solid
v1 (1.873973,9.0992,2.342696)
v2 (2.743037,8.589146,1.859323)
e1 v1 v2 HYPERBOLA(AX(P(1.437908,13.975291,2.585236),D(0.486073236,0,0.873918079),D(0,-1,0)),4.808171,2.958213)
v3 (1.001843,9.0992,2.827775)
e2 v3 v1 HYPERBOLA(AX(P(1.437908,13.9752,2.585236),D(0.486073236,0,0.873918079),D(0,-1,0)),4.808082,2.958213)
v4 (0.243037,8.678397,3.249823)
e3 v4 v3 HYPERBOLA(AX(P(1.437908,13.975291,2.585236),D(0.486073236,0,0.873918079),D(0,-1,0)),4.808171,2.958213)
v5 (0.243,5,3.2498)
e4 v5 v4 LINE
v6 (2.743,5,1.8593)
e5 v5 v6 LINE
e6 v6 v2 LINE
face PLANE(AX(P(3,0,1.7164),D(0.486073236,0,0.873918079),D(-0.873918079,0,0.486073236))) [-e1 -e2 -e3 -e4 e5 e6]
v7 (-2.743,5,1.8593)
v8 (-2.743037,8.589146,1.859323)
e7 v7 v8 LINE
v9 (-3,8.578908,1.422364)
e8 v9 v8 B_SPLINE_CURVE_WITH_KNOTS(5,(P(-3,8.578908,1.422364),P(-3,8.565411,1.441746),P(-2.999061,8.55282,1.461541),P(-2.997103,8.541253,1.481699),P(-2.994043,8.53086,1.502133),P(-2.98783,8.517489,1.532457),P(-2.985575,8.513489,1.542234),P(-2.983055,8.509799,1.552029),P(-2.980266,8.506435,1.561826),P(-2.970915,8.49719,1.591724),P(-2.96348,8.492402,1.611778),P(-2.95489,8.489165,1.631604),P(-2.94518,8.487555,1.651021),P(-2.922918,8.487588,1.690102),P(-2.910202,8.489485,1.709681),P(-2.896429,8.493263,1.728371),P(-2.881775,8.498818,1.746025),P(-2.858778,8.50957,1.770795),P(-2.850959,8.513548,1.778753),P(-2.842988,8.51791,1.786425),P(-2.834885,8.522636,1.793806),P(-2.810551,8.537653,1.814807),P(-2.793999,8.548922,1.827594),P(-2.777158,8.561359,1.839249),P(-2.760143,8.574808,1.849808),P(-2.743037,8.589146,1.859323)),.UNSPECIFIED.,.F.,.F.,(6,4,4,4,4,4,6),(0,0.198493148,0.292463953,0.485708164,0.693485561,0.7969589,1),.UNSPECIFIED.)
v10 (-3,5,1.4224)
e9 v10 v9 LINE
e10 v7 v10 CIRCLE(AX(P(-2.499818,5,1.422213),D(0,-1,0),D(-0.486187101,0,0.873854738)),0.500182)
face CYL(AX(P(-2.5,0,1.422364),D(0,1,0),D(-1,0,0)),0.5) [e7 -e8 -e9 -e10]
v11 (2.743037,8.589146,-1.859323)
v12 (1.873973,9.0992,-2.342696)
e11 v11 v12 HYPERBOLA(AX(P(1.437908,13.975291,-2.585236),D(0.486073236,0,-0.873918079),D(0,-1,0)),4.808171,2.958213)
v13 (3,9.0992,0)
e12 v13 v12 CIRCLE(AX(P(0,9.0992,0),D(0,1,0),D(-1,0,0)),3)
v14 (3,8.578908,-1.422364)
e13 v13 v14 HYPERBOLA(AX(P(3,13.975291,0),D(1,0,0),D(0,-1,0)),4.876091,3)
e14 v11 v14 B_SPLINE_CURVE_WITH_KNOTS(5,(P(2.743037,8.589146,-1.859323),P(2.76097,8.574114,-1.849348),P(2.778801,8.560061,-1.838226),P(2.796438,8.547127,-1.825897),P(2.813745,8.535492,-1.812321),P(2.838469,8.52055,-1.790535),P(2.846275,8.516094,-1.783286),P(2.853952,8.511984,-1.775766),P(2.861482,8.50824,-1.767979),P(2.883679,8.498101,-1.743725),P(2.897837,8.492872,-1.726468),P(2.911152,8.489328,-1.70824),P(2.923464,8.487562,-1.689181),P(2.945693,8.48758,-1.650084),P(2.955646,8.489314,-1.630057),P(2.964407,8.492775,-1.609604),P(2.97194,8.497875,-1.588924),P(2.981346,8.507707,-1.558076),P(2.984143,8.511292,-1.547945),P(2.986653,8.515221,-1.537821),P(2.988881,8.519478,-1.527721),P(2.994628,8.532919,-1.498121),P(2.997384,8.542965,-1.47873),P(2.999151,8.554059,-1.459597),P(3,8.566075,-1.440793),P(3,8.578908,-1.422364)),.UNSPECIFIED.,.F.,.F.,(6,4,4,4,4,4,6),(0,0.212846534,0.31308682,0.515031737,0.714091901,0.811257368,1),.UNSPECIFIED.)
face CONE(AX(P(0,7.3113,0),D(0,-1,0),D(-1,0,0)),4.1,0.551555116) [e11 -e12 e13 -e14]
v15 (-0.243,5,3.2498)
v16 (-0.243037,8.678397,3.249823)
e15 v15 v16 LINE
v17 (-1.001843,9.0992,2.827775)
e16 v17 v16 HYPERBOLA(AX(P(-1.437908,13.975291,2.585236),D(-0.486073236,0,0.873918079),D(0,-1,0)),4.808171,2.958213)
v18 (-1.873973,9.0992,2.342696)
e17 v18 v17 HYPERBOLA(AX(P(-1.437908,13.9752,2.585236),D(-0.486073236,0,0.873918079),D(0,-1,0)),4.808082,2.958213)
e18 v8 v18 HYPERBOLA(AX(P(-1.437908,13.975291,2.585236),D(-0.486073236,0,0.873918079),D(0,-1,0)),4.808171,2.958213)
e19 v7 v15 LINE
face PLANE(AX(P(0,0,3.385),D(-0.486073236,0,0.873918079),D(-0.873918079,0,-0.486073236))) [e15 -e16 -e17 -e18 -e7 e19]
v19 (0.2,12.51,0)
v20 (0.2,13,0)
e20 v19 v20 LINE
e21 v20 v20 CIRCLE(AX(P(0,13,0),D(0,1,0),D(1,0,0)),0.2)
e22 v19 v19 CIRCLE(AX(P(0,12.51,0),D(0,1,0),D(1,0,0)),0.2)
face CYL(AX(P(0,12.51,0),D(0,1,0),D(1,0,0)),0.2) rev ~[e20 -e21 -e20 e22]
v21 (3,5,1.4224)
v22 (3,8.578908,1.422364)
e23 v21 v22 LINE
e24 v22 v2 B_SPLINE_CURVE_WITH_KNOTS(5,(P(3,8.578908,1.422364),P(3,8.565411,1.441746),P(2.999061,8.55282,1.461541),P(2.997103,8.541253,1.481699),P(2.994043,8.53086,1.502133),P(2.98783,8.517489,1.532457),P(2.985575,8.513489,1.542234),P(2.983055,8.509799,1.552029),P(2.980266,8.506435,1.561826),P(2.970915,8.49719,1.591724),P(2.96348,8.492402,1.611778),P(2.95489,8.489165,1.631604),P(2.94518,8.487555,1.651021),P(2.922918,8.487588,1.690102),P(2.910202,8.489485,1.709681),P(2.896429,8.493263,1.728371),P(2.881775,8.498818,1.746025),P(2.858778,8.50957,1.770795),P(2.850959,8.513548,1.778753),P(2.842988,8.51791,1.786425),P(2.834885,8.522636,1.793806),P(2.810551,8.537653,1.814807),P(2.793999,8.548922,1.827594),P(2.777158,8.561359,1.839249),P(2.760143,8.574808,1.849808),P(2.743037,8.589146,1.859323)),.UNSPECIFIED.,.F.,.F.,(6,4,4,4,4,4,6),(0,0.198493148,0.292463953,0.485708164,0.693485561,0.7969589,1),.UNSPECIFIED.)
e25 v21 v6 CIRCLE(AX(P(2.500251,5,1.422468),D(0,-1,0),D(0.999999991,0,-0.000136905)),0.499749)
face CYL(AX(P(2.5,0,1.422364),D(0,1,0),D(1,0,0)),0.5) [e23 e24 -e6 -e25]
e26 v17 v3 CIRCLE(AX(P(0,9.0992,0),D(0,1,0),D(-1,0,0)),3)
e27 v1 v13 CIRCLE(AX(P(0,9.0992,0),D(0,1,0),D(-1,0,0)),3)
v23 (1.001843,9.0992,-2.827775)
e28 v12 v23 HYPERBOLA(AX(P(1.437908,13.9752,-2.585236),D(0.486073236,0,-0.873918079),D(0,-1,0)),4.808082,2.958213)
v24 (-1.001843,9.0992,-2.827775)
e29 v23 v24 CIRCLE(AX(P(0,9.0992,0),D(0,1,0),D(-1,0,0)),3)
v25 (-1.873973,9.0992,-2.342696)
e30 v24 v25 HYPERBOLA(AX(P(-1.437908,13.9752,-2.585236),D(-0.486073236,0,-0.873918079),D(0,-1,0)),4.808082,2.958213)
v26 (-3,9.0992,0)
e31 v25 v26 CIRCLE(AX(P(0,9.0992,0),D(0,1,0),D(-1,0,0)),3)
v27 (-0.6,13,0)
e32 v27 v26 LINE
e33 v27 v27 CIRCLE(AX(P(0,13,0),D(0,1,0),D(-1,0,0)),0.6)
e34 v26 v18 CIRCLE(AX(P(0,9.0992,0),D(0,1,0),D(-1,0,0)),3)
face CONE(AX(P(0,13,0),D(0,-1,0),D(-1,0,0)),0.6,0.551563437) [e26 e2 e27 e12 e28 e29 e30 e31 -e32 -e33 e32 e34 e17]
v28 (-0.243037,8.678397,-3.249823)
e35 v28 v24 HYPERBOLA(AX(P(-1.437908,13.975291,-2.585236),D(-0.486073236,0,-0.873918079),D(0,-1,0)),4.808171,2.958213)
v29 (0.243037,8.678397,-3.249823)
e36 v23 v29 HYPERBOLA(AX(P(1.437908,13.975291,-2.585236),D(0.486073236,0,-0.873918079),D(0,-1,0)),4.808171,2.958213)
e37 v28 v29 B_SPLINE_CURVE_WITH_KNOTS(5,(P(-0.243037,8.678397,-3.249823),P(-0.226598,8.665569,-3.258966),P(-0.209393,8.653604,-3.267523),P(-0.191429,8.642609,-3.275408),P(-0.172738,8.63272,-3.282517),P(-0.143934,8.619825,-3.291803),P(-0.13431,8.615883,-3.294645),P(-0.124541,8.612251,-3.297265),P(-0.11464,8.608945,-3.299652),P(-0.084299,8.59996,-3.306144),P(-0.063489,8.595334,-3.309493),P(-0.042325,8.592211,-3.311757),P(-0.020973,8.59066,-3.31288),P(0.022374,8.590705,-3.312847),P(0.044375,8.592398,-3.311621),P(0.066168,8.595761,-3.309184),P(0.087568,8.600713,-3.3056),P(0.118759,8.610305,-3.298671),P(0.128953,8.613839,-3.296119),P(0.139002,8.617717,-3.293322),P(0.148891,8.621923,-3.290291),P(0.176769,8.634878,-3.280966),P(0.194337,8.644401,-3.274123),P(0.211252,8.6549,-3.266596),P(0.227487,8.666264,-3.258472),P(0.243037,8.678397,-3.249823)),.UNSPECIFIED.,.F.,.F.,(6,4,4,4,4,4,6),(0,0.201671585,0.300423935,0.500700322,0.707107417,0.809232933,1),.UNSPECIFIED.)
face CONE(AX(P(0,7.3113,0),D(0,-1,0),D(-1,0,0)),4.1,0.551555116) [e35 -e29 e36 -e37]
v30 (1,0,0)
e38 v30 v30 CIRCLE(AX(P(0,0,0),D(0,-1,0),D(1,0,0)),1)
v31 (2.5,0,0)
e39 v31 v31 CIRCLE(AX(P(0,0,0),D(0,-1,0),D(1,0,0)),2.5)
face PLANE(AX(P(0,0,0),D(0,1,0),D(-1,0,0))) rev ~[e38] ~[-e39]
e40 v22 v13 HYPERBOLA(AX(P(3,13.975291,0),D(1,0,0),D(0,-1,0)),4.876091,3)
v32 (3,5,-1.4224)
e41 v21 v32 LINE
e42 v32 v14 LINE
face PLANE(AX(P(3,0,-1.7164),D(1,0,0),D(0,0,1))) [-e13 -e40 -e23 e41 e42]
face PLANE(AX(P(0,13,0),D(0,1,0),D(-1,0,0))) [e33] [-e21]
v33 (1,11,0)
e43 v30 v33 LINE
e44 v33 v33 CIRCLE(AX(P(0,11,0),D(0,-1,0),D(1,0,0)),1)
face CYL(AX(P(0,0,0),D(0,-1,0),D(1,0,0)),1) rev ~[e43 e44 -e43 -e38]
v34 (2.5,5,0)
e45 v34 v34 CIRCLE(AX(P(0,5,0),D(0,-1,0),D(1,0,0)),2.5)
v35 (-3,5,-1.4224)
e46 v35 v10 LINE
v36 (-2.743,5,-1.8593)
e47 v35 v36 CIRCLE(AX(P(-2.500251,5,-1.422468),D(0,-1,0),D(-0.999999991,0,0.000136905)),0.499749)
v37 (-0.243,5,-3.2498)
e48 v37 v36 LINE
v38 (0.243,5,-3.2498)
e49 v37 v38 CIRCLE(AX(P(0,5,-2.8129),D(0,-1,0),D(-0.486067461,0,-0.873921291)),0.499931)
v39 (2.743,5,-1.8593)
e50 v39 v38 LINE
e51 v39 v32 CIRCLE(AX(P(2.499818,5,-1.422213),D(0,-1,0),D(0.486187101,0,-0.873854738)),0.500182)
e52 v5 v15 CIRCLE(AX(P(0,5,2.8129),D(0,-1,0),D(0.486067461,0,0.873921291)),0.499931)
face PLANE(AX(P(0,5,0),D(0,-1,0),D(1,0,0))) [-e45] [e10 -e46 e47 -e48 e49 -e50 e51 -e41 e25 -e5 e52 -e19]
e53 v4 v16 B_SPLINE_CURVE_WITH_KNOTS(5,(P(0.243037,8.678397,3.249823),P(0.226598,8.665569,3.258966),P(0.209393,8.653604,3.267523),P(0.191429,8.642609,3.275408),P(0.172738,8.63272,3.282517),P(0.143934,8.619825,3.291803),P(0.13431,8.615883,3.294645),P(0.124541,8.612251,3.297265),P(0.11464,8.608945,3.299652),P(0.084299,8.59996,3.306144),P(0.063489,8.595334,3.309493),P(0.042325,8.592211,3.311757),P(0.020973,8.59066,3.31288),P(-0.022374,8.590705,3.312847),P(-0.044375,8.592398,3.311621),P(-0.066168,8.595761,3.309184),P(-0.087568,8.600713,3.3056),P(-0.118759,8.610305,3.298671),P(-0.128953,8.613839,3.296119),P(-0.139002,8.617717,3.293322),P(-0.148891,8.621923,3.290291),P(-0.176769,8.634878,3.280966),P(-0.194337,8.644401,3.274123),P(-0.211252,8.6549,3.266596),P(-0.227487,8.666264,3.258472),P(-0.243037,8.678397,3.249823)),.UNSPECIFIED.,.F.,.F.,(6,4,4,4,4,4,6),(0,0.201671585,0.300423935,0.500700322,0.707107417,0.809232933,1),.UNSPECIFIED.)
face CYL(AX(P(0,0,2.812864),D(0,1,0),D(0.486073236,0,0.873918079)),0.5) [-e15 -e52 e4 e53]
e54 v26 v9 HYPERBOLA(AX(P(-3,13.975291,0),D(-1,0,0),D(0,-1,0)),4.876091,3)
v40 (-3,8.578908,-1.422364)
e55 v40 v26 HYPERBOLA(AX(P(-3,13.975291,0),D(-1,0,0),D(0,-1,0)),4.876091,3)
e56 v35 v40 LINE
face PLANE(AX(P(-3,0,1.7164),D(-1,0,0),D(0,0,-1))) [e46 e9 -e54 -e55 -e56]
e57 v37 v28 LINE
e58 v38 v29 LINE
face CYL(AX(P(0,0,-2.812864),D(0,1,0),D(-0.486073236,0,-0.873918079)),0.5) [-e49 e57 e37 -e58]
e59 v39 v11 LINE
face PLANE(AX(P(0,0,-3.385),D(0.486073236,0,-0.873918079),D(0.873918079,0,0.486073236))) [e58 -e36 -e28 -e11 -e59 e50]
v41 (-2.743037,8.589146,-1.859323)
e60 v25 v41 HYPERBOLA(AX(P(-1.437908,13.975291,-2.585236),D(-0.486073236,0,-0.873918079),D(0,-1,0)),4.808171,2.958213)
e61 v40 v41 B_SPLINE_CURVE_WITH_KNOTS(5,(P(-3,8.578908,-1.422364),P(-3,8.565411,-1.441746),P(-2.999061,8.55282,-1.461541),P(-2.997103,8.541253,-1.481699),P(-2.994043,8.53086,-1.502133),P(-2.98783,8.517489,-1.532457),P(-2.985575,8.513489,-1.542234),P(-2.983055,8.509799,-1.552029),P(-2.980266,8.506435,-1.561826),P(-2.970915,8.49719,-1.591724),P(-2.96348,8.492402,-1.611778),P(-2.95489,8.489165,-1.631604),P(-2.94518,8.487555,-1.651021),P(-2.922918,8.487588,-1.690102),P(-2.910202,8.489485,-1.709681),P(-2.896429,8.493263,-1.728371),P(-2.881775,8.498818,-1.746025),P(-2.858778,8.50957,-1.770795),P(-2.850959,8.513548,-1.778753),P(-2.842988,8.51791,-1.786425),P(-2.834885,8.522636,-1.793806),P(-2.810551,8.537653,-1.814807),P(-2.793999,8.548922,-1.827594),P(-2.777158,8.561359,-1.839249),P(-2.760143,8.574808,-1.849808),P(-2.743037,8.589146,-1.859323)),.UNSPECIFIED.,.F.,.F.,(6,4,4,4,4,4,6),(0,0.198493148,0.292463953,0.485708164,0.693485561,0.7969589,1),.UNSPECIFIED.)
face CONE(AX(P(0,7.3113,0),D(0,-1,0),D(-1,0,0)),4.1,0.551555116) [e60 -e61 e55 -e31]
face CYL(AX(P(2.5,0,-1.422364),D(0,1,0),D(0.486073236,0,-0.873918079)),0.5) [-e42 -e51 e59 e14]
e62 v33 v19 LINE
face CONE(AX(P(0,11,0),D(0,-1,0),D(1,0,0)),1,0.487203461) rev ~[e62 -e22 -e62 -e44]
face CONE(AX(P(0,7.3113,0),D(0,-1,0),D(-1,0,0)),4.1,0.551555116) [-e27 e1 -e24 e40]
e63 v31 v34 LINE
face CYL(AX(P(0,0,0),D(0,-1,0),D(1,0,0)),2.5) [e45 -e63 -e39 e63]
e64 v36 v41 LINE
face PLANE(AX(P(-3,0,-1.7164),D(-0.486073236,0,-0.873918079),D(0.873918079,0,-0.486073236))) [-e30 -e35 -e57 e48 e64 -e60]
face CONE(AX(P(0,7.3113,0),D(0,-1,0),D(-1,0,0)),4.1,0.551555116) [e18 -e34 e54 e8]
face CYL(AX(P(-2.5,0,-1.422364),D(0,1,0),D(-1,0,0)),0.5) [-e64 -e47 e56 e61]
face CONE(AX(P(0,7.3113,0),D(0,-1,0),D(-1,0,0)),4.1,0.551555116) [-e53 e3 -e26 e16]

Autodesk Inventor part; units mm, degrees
ref_plane "YZ Plane" through (0, 0, 0) normal (1, 0, 0) x (0, 1, 0)
ref_plane "XZ Plane" through (0, 0, 0) normal (0, 1, 0) x (-1, 0, 0)
ref_plane "XY Plane" through (0, 0, 0) normal (0, 0, 1) x (1, 0, 0)
sketch "Sketch1" plane through (0, 0, 0) normal (0, 1, 0) x (-1, 0, 0)
  line L0 (0, -4.739) -> (0, 4.739) construction
  line L1 (4.2, 0) -> (-4.2, 0) construction
  line L2 (3, 1.7164) -> (3, -1.7164)
  line L3 (3, -1.7164) -> (0, -3.385)
  line L4 (0, -3.385) -> (-3, -1.7164)
  line L5 (-3, -1.7164) -> (-3, 1.7164)
  line L6 (-3, 1.7164) -> (0, 3.385)
  line L7 (0, 3.385) -> (3, 1.7164)
  point P0 (3, 0)
  point P1 (-3, 0)
  dimension "d2" = 6.77
  dimension "d3" = 6
extrude "Extrusion1" add sketch "Sketch1" along normal blind 13
fillet "Fillet1" radius 0.5 6 edges at (0, 6.5, 3.385) (3, 6.5, 1.7164) (3, 6.5, -1.7164) (0, 6.5, -3.385) (-3, 6.5, -1.7164) (-3, 6.5, 1.7164)
sketch "Sketch2" plane through (0, 0, 0) normal (0, 0, 1) x (1, 0, 0)
  line L0 (-0.243, 13) -> (0.243, 13) projected
  line L1 (0, 13) -> (-0.1, 13)
  line L2 (-0.1, 13) -> (-0.6, 13)
  line L3 (-0.6, 13) -> (-3, 9.0992)
  line L4 (-0.243, 13) -> (-2.743, 13) projected
  line L5 (0, 13) -> (0, 13.665)
  line L6 (-0.6, 13) -> (-4.1, 13)
  line L7 (-4.1, 13) -> (-4.1, 7.3113)
  line L8 (-3, 13) -> (-3, 0) projected
  line L9 (-4.1, 7.3113) -> (-3, 9.0992)
  point P0 (0, 0)
  dimension "d7" = 0.1
  dimension "d8" = 0.5
  dimension "d9" = 4.58
  dimension "d11" = 3.5
revolve "Revolution1" cut sketch "Sketch2" angle 360 about axis through (0, 13, 0) along (0, 1, 0)
sketch "Sketch3" plane through (0, 0, 0) normal (0, -1, 0) x (1, 0, 0)
  circle A0 centre (0, 0) radius 2.5
  arc A1 (-2.743, 1.8593) -> (-3, 1.4224) centre (-2.5, 1.4224) ccw projected
  line L0 (-3, -1.4224) -> (-3, 1.4224) projected
  arc A2 (-3, -1.4224) -> (-2.743, -1.8593) centre (-2.5, -1.4224) ccw projected
  line L1 (-0.243, -3.2498) -> (-2.743, -1.8593) projected
  arc A3 (-0.243, -3.2498) -> (0.243, -3.2498) centre (0, -2.8129) ccw projected
  line L2 (2.743, -1.8593) -> (0.243, -3.2498) projected
  arc A4 (2.743, -1.8593) -> (3, -1.4224) centre (2.5, -1.4224) ccw projected
  line L3 (3, 1.4224) -> (3, -1.4224) projected
  arc A5 (3, 1.4224) -> (2.743, 1.8593) centre (2.5, 1.4224) ccw projected
  line L4 (0.243, 3.2498) -> (2.743, 1.8593) projected
  arc A6 (0.243, 3.2498) -> (-0.243, 3.2498) centre (0, 2.8129) ccw projected
  line L5 (-2.743, 1.8593) -> (-0.243, 3.2498) projected
  dimension "d12" = 5
extrude "Extrusion2" cut sketch "Sketch3" against normal blind 5
thread "Thread1" size "M6x1" class "6g" standard "ANSI Metric M Profile" length 4
sketch "Sketch4" plane through (0, 0, 0) normal (0, -1, 0) x (1, 0, 0)
  circle A0 centre (0, 0) radius 0.6 projected
  circle A1 centre (0, 0) radius 1
  point P0 (0, 0)
  dimension "d20" = 2
extrude "Extrusion3" cut sketch "Sketch4" against normal blind 11 contours A0 | A1
sketch "Sketch5" plane through (0, 0, 0) normal (0, 0, 1) x (1, 0, 0)
  line L0 (1, 11) -> (-1, 11) projected
  line L1 (-1, 11) -> (-0.2, 12.51)
  line L2 (1, 11) -> (0.2, 12.51)
  line L3 (-0.2, 12.51) -> (0.2, 12.51) construction
  line L4 (0, -2.6) -> (0, 15.6) projected
  line L5 (0.6, 13) -> (-0.6, 13) projected
  line L6 (0.2, 12.51) -> (0.2, 13.1094)
  line L7 (0.2, 13.1094) -> (-0.2, 13.1094)
  line L8 (-0.2, 13.1094) -> (-0.2, 12.51)
  point P0 (0, 0)
  point P1 (0, 12.51)
  point P2 (0, 13.1094)
  point P3 (0, 11)
  dimension "d25" = 0.4
  dimension "d26" = 1.51
revolve "Revolution2" cut sketch "Sketch5" angle 360 about axis through (0, -10, 0) along (0, 1, 0) contours L0 L4 L5 L6 L2 | L4 L7 L6 L5
properties part number "Nozzle 0.4mm" material "Brass, Soft Yellow"
